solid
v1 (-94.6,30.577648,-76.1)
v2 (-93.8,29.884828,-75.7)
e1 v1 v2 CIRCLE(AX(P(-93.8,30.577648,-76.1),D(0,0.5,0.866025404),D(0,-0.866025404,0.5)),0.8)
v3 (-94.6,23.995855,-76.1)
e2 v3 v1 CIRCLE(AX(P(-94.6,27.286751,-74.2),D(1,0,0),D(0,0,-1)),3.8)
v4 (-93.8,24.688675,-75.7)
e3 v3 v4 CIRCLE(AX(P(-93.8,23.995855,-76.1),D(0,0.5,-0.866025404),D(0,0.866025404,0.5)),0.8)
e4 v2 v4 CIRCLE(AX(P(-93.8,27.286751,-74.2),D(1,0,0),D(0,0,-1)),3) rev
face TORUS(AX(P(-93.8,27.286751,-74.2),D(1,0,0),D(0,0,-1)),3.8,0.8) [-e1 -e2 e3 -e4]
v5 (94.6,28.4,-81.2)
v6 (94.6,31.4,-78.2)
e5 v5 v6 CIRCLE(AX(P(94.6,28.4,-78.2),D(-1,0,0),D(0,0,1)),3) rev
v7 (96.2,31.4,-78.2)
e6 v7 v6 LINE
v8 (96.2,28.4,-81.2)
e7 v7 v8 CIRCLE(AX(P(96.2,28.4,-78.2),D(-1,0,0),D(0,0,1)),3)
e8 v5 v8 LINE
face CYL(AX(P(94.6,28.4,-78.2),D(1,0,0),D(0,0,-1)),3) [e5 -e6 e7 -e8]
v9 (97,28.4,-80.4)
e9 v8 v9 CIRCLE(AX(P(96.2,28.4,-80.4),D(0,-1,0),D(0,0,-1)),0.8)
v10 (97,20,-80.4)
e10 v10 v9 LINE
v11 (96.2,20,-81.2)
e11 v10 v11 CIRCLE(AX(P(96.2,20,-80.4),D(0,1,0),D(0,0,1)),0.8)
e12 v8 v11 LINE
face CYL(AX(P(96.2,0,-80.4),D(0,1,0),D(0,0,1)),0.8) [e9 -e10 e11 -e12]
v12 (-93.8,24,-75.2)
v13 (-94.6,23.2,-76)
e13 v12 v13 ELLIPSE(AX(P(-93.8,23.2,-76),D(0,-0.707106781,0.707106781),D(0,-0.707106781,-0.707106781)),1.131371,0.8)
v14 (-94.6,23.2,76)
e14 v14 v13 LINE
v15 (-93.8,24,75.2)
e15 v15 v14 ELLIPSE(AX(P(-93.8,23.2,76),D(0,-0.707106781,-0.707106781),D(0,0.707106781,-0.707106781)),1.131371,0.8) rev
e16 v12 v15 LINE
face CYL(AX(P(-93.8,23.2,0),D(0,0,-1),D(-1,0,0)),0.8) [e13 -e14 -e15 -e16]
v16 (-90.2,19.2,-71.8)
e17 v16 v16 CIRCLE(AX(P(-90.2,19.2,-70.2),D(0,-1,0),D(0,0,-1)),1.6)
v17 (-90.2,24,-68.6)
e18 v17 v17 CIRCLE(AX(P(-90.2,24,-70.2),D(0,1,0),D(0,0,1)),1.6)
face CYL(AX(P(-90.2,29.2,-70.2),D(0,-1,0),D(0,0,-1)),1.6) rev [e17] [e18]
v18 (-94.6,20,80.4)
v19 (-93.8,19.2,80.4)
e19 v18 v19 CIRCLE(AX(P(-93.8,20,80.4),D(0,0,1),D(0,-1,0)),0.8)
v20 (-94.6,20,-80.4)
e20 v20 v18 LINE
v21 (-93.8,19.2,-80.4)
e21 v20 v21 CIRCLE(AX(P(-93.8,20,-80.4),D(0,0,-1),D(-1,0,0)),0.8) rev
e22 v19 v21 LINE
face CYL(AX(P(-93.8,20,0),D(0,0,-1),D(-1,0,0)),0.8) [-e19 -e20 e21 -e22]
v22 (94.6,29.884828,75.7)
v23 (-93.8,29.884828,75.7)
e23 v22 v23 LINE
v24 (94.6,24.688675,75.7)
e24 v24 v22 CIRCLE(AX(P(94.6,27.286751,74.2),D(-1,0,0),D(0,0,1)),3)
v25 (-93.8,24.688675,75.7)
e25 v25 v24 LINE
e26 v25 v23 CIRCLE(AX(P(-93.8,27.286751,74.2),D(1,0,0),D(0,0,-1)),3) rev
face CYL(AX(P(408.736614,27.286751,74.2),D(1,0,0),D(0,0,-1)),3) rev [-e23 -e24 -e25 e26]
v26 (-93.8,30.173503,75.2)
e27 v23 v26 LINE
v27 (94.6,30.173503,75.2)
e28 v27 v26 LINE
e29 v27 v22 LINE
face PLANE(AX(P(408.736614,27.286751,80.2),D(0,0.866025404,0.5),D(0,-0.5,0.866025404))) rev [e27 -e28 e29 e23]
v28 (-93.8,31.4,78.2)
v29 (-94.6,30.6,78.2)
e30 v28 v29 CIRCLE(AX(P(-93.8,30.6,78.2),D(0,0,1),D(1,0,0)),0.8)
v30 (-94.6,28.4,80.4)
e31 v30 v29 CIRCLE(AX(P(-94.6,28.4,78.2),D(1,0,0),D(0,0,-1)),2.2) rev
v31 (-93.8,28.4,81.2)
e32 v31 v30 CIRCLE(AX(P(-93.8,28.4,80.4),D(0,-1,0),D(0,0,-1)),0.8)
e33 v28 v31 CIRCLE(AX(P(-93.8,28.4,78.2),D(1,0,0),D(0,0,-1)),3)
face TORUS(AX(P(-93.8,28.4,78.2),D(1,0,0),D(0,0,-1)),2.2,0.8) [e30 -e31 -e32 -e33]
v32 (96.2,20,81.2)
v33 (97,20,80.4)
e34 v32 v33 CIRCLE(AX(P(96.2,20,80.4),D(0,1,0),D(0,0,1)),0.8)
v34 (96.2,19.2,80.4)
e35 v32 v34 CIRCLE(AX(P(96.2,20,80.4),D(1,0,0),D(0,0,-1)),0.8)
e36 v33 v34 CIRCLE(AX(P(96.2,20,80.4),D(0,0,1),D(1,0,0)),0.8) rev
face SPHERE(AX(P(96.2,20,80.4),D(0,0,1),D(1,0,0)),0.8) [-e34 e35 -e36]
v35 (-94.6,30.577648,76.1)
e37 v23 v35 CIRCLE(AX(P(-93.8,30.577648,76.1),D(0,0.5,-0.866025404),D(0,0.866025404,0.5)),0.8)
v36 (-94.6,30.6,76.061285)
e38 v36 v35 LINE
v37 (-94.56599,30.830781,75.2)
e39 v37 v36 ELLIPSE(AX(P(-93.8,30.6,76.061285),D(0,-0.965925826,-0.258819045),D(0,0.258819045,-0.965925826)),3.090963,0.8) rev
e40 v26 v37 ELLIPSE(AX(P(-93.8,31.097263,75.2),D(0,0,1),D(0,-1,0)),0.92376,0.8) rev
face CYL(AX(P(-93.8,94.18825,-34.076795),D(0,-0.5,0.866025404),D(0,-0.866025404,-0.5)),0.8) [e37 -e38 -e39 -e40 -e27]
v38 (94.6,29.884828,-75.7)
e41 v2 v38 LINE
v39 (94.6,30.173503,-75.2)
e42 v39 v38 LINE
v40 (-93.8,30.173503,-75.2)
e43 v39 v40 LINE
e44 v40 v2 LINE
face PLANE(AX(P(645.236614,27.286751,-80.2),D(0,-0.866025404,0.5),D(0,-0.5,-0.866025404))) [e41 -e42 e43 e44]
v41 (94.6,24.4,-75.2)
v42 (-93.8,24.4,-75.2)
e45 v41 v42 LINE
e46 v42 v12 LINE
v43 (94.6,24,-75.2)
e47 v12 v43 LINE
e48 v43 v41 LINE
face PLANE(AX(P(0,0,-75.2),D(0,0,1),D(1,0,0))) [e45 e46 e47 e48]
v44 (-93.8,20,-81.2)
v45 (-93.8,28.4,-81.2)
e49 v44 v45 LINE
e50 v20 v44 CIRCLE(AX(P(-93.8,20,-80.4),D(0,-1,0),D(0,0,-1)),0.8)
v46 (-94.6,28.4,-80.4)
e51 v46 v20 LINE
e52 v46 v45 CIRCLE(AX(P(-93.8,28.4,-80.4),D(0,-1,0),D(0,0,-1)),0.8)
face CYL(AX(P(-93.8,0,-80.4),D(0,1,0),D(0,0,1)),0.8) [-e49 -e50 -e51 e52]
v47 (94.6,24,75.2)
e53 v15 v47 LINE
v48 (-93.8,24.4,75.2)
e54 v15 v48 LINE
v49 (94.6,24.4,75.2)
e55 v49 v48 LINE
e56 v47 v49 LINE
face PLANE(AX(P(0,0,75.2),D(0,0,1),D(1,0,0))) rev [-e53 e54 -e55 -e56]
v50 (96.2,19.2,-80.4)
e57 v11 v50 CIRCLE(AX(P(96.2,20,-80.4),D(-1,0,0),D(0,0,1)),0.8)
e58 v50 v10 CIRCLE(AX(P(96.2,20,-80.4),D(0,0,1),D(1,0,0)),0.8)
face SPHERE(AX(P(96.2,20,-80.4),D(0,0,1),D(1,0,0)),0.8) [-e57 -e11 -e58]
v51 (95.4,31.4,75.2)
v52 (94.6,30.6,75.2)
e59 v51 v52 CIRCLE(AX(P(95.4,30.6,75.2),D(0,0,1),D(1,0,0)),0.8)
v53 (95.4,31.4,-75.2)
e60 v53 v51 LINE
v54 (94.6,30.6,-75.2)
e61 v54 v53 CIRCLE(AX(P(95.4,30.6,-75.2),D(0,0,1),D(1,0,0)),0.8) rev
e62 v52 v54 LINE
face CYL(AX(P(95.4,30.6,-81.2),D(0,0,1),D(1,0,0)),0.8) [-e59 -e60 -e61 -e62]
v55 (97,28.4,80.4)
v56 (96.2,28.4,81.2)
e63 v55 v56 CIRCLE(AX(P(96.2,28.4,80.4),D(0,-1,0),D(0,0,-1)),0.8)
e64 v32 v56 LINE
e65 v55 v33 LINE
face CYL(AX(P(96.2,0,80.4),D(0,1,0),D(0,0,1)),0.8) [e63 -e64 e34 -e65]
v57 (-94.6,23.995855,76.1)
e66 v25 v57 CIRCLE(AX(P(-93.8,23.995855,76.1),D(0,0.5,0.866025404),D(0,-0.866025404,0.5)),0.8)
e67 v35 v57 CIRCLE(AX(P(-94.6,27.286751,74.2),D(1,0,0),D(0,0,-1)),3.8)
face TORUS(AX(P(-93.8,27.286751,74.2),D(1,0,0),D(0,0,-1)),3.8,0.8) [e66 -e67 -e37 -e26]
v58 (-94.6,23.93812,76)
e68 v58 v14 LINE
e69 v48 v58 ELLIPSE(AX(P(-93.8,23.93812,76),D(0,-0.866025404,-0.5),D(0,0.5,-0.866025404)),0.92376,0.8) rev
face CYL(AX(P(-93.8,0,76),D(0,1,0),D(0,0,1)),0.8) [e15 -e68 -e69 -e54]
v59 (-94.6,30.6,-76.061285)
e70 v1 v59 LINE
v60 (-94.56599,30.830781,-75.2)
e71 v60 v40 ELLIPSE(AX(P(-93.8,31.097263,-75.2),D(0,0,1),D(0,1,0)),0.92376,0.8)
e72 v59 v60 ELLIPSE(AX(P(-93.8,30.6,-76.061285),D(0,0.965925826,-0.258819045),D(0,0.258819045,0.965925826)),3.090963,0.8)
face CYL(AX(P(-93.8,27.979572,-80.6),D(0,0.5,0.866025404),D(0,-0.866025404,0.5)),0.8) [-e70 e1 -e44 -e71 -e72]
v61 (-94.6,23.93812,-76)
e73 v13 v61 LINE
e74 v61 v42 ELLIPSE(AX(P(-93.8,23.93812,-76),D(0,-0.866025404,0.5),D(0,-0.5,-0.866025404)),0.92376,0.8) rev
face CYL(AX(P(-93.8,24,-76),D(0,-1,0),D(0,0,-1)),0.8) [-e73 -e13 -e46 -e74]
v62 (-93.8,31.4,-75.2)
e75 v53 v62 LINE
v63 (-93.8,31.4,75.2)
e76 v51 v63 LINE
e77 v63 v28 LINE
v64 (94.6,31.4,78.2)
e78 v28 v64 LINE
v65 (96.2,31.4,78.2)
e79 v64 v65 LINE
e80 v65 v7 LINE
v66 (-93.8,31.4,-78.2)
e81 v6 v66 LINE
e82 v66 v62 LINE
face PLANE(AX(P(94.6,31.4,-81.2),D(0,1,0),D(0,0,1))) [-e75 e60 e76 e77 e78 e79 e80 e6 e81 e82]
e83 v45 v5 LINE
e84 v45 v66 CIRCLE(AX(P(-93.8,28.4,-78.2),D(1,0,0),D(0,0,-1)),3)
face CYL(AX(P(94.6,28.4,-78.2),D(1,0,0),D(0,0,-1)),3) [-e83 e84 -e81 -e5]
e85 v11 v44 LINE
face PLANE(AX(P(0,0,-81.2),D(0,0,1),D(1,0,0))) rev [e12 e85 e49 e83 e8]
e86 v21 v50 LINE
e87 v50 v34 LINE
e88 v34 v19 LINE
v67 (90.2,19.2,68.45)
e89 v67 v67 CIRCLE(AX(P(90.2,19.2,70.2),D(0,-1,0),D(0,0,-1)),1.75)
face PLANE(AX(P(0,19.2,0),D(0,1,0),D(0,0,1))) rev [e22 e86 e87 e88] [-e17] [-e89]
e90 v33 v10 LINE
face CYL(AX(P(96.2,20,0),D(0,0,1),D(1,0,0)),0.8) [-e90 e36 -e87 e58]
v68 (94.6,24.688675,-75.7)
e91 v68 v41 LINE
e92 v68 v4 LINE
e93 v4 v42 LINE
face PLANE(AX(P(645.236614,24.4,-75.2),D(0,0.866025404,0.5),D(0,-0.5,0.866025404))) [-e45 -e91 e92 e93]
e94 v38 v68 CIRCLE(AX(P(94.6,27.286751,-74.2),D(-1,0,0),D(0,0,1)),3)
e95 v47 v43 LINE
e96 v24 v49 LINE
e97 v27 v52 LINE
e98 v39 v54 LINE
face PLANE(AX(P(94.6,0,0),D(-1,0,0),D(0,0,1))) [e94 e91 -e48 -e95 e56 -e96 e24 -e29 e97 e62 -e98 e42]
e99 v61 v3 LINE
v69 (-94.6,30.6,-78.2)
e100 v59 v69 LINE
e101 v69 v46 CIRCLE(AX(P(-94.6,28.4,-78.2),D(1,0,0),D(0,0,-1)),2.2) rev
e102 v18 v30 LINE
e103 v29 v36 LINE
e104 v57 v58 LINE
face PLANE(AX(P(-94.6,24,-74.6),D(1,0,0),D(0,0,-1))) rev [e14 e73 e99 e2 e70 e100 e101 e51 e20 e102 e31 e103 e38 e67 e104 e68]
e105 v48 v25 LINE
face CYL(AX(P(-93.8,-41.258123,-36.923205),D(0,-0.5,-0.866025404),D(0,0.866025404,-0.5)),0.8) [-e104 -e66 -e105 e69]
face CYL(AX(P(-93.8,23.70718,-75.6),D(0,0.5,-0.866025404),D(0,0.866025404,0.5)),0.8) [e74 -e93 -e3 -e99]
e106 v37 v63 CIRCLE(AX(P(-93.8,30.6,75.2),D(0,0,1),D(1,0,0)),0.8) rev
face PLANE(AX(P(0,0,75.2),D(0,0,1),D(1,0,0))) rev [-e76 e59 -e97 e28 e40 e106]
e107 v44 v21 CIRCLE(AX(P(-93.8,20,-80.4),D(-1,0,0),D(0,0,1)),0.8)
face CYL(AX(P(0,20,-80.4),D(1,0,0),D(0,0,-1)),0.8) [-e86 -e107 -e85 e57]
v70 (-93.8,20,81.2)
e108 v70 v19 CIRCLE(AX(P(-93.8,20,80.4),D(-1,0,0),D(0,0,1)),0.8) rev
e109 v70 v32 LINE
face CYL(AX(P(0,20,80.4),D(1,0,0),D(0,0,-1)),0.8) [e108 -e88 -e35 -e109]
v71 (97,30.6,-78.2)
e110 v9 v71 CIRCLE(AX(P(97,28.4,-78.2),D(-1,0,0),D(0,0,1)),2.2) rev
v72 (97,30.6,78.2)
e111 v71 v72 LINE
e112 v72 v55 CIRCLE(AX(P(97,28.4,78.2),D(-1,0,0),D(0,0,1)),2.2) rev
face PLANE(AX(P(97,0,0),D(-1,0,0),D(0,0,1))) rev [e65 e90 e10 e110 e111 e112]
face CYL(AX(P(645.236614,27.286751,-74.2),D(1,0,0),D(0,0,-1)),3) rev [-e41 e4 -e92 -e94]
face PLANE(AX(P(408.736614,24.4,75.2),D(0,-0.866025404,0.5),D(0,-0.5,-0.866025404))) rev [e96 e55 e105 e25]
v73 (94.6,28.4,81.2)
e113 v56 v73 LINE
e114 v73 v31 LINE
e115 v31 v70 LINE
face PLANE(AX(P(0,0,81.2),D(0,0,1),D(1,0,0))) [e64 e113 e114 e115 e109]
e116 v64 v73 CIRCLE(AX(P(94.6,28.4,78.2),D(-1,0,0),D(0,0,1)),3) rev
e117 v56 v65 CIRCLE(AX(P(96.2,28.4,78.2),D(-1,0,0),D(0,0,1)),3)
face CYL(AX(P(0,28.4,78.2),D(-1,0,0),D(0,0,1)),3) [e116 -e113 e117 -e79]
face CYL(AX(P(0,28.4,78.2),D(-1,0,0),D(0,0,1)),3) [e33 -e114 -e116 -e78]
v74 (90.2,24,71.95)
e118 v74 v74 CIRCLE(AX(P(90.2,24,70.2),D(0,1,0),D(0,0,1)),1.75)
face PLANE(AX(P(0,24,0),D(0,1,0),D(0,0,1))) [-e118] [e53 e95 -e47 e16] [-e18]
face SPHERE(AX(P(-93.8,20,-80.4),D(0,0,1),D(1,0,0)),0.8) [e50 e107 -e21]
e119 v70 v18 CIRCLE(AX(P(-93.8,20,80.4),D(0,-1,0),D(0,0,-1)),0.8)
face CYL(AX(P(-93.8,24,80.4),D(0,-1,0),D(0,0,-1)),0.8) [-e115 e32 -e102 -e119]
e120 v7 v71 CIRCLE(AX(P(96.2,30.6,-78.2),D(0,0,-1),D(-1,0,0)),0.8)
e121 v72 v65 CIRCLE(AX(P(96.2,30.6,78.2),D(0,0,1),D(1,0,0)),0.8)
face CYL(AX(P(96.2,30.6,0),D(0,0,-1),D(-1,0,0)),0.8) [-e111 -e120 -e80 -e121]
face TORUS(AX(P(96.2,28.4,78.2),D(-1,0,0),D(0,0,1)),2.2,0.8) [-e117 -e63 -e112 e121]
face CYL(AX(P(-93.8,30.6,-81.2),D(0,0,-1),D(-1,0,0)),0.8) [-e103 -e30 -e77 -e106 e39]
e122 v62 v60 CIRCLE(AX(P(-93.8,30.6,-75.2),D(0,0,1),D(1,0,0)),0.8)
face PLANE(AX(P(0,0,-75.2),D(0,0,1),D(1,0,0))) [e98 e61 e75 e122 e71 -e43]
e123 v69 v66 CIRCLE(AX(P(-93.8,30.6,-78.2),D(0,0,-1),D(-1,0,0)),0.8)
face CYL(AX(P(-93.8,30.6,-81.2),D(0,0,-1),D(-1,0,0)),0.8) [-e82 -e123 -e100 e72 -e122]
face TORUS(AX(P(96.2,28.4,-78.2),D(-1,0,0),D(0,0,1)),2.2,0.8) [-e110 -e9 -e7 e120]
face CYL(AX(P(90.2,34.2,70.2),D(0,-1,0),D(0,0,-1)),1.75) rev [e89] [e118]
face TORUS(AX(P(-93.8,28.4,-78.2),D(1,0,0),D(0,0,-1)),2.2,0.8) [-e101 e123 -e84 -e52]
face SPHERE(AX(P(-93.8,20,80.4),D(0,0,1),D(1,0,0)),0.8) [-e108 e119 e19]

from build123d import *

# Parameters (mm, degrees)
SKETCH_1_W                         = 189.2
SKETCH_1_H                         = 149.2
EXTRUDE_184_4_144_4_24_DEPTH       = 24
SKETCH_2_W                         = 184.4
SKETCH_2_H                         = 144.4
CUT_EXTRUDE_181_2_141_2_22_4_DEPTH = 22.4
EXTRUDE_972_DEPTH                  = 189.2
EXTRUDE_1201_DEPTH                 = 189.2
SKETCH_11_W                        = 189.2
SKETCH_11_H                        = 16
EXTRUDE_0_6_DEPTH                  = 0.6
PATTERN_LINEAR_4_COUNT             = 2
PATTERN_LINEAR_4_PITCH             = 149.8
SKETCH_13_W                        = 189.2
SKETCH_13_H                        = 15
EXTRUDE_1758_DEPTH                 = 6
PATTERN_LINEAR_5_COUNT             = 2
PATTERN_LINEAR_5_PITCH             = 156.4
CUT_EXTRUDE_2280_DEPTH             = 209.269152781
CUT_EXTRUDE_2280_DEPTH_BACK        = 189.2
CUT_EXTRUDE_START                  = -189.2
CUT_EXTRUDE_2756_DEPTH             = 189.2
FILLET_3_R                         = 3
FILLET_5_R                         = 5
SKETCH_18_W                        = 162.4
SKETCH_18_H                        = 23.4
EXTRUDE_4517_DEPTH                 = 2.4
SKETCH_20_W                        = 42.4
SKETCH_20_H                        = 11
CUT_EXTRUDE_5_DEPTH                = 2.4
SKETCH_21_W                        = 0.6
SKETCH_21_H                        = 52.4
CUT_EXTRUDE_6_DEPTH                = 13
SKETCH_24_W                        = 191.218678314
SKETCH_24_H                        = 37.433567077
CUT_EXTRUDE_8_DEPTH                = 203.6
SKETCH_25_W                        = 191.6
SKETCH_25_H                        = 162.4
EXTRUDE_2_DEPTH                    = 3.2
FILLET_23_R                        = 3
FILLET_16_R                        = 0.8
FILLET_25_R                        = 0.8
SKETCH_26_R                        = 1.6
CUT_EXTRUDE_9_DEPTH                = 10
SKETCH_27_R                        = 1.75
CUT_EXTRUDE_10_DEPTH               = 15


# Read off the part's stored shape, not the designer's step: правый паз
with BuildPart() as part:
    # Эскиз1 → внешний 184,4 х 144,4 х 24 (new body)
    with BuildSketch(Plane(origin=(0, 0, 0), x_dir=(1, 0, 0), z_dir=(0, 1, 0))):
        Rectangle(SKETCH_1_W, SKETCH_1_H)
    extrude(amount=EXTRUDE_184_4_144_4_24_DEPTH)

    # Эскиз2 → внутр размер  181,2 х 141,2 х 22,4 (cut)
    with BuildSketch(Plane(origin=(0, 0, 0), x_dir=(-1, 0, 0), z_dir=(0, -1, 0))):
        Rectangle(SKETCH_2_W, SKETCH_2_H)
    extrude(amount=-CUT_EXTRUDE_181_2_141_2_22_4_DEPTH, mode=Mode.SUBTRACT)

    # Эскиз5 → Extrude 972 (add)
    with BuildSketch(Plane(origin=(94.6, 0, 0), x_dir=(0, 0, -1), z_dir=(1, 0, 0))):
        Polygon((74.6, 0), (79.6, 2.886751346), (74.6, 5.773502692), align=None)
    extrude(amount=-EXTRUDE_972_DEPTH)

    # Эскиз4 → Extrude 1201 (add)
    with BuildSketch(Plane(origin=(94.6, 0, 0), x_dir=(0, 0, -1), z_dir=(1, 0, 0))):
        Polygon((-74.6, 0), (-79.6, 2.886751346), (-74.6, 5.773502692), align=None)
    extrude(amount=-EXTRUDE_1201_DEPTH)

    # Эскиз11 → проставка 0,6 мм (add)
    with BuildSketch(Plane(origin=(0, 0, -74.6), x_dir=(-1, 0, 0), z_dir=(0, 0, -1))):
        with Locations((0, 16)):
            Rectangle(SKETCH_11_W, SKETCH_11_H)
    extrude_0_6 = extrude(amount=EXTRUDE_0_6_DEPTH)

    # Линейный массив4: проставка 0,6 мм ×2
    with Locations(*[(0, 0, i * PATTERN_LINEAR_4_PITCH) for i in range(1, PATTERN_LINEAR_4_COUNT)]):
        add(extrude_0_6)

    # Эскиз13 → Extrude 1758 (add)
    with BuildSketch(Plane(origin=(0, 0, -75.2), x_dir=(-1, 0, 0), z_dir=(0, 0, -1))):
        with Locations((0, 23.9)):
            Rectangle(SKETCH_13_W, SKETCH_13_H)
    extrude_1758 = extrude(amount=EXTRUDE_1758_DEPTH)

    # Линейный массив5: Extrude 1758 ×2
    with Locations(*[(0, 0, i * PATTERN_LINEAR_5_PITCH) for i in range(1, PATTERN_LINEAR_5_COUNT)]):
        add(extrude_1758)

    # Эскиз14 → Cut-Extrude 2280 (cut, two sides: drawn at the far end of the back side and taken through both)
    with BuildSketch(Plane(origin=(94.6, 0, 0), x_dir=(0, 0, -1), z_dir=(1, 0, 0)).offset(-CUT_EXTRUDE_2280_DEPTH_BACK)):
        Polygon((75.2, 30.173502692), (75.2, 24.4), (80.2, 27.286751346), align=None)
    extrude(amount=CUT_EXTRUDE_2280_DEPTH + CUT_EXTRUDE_2280_DEPTH_BACK, mode=Mode.SUBTRACT)

    # Cut-Extrude 2756 outline → Cut-Extrude 2756 (cut)
    with BuildSketch(Plane(origin=(94.6, 0, 0), x_dir=(0, 0, -1), z_dir=(1, 0, 0)).offset(CUT_EXTRUDE_START)):
        Polygon((-75.2, 24.4), (-75.2, 30.173502692), (-80.2, 27.286751346), align=None)
    extrude(amount=CUT_EXTRUDE_2756_DEPTH, mode=Mode.SUBTRACT)

    # Скругление 3 мм
    fillet_3_edges = [part.edges().sort_by_distance(p)[0] for p in [
        (0, 27.286751346, -80.2),
        (0, 27.286751346, 80.2),
        (0, 2.886751346, -79.6),
        (0, 2.886751346, 79.6),
        (0, 16.4, -75.2),
        (0, 31.4, -81.2),
        (0, 16.4, 75.2),
        (0, 31.4, 81.2),
    ]]
    fillet(fillet_3_edges, radius=FILLET_3_R)

    # Скругление 5 мм
    fillet_5_edges = [part.edges().sort_by_distance(p)[0] for p in [
        (0, 16.4, -81.2),
    ]]
    fillet(fillet_5_edges, radius=FILLET_5_R)

    # Эскиз18 → Extrude 4517 (add)
    with BuildSketch(Plane(origin=(94.6, 0, 0), x_dir=(0, 0, -1), z_dir=(1, 0, 0))):
        with Locations((0, 19.7)):
            Rectangle(SKETCH_18_W, SKETCH_18_H)
    extrude(amount=EXTRUDE_4517_DEPTH)

    # Эскиз20 → Вырез-Вытянуть5 (cut)
    with BuildSketch(Plane(origin=(97, 0, 0), x_dir=(0, 0, -1), z_dir=(1, 0, 0))):
        with Locations((0, 13.5)):
            Rectangle(SKETCH_20_W, SKETCH_20_H)
    extrude(amount=-CUT_EXTRUDE_5_DEPTH, mode=Mode.SUBTRACT)

    # Эскиз21 → Вырез-Вытянуть6 (cut)
    with BuildSketch(Plane.XZ.offset(-8)):
        with Locations((94.9, 0)):
            Rectangle(SKETCH_21_W, SKETCH_21_H)
    extrude(amount=-CUT_EXTRUDE_6_DEPTH, mode=Mode.SUBTRACT)

    # Эскиз24 → Вырез-Вытянуть8 (cut)
    with BuildSketch(Plane.ZY.offset(94.6)):
        with Locations((-2.778384041, 3.683216462)):
            Rectangle(SKETCH_24_W, SKETCH_24_H)
    extrude(amount=-CUT_EXTRUDE_8_DEPTH, mode=Mode.SUBTRACT)

    # Эскиз25 → Бобышка-Вытянуть2 (add)
    with BuildSketch(Plane.XZ.offset(-22.4)):
        with Locations((1.2, 0)):
            Rectangle(SKETCH_25_W, SKETCH_25_H)
    extrude(amount=EXTRUDE_2_DEPTH)

    # Скругление23
    fillet_23_edges = [part.edges().sort_by_distance(p)[0] for p in [
        (95.8, 31.4, -81.2),
        (95.8, 31.4, 81.2),
    ]]
    fillet(fillet_23_edges, radius=FILLET_23_R)

    # Скругление16
    fillet_16_edges = [part.edges().sort_by_distance(p)[0] for p in [
        (94.6, 31.4, 0),
        (97, 23.8, -81.2),
        (97, 19.2, 0),
        (97, 31.4, 0),
        (97, 23.8, 81.2),
        (97, 30.521320344, 80.321320344),
        (97, 30.521320344, -80.321320344),
    ]]
    fillet(fillet_16_edges, radius=FILLET_16_R)

    # Скругление25
    # the kernel refuses this fillet: 0.8 mm, written as the material it takes off along each edge
    with BuildSketch(Plane(origin=(96.2, 20, -80.4), x_dir=(0, -1, 0), z_dir=(0, 0, -1))) as fillet_25_piece_1_section:
        Polygon((0, 0), (FILLET_25_R * 1.02, 0), (FILLET_25_R * 1.02, -FILLET_25_R * 1.02), (0, -FILLET_25_R * 1.02), align=None)
    fillet_25_piece_1 = extrude(amount=FILLET_25_R * 1.02, mode=Mode.PRIVATE)
    fillet_25_piece_1 = fillet_25_piece_1 - Plane(origin=(96.2, 20, -80.4), x_dir=(-0.7071067811865475, 0.7071067811865475, 0), z_dir=(0, 0, -1)) * Sphere(FILLET_25_R, mode=Mode.PRIVATE)
    add(fillet_25_piece_1, mode=Mode.SUBTRACT)
    with BuildSketch(Plane(origin=(96.2, 20, 80.4), x_dir=(0, -1, 0), z_dir=(0, 0, 1))) as fillet_25_piece_2_section:
        Polygon((0, 0), (FILLET_25_R * 1.02, 0), (FILLET_25_R * 1.02, FILLET_25_R * 1.02), (0, FILLET_25_R * 1.02), align=None)
    fillet_25_piece_2 = extrude(amount=FILLET_25_R * 1.02, mode=Mode.PRIVATE)
    fillet_25_piece_2 = fillet_25_piece_2 - Plane(origin=(96.2, 20, 80.4), x_dir=(-0.7071067811865475, 0.7071067811865475, 0), z_dir=(0, 0, 1)) * Sphere(FILLET_25_R, mode=Mode.PRIVATE)
    add(fillet_25_piece_2, mode=Mode.SUBTRACT)
    with BuildSketch(Plane(origin=(-93.8, 20, -80.4), x_dir=(-1, 0, 0), z_dir=(0, 0, -1))) as fillet_25_piece_3_section:
        Polygon((0, 0), (FILLET_25_R * 1.02, 0), (FILLET_25_R * 1.02, -FILLET_25_R * 1.02), (0, -FILLET_25_R * 1.02), align=None)
    fillet_25_piece_3 = extrude(amount=FILLET_25_R * 1.02, mode=Mode.PRIVATE)
    fillet_25_piece_3 = fillet_25_piece_3 - Plane(origin=(-93.8, 20, -80.4), x_dir=(0.7071067811865475, 0.7071067811865475, 0), z_dir=(0, 0, -1)) * Sphere(FILLET_25_R, mode=Mode.PRIVATE)
    add(fillet_25_piece_3, mode=Mode.SUBTRACT)
    with BuildSketch(Plane(origin=(-93.8, 20, 80.4), x_dir=(0, -1, 0), z_dir=(0, 0, 1))) as fillet_25_piece_4_section:
        Polygon((0, 0), (FILLET_25_R * 1.02, 0), (FILLET_25_R * 1.02, -FILLET_25_R * 1.02), (0, -FILLET_25_R * 1.02), align=None)
    fillet_25_piece_4 = extrude(amount=FILLET_25_R * 1.02, mode=Mode.PRIVATE)
    fillet_25_piece_4 = fillet_25_piece_4 - Plane(origin=(-93.8, 20, 80.4), x_dir=(0.7071067811865475, 0.7071067811865475, 0), z_dir=(0, 0, 1)) * Sphere(FILLET_25_R, mode=Mode.PRIVATE)
    add(fillet_25_piece_4, mode=Mode.SUBTRACT)
    with BuildSketch(Plane(origin=(-94.6, 24, 75.2), x_dir=(0, -1, 0), z_dir=(0, 0, -1))) as fillet_25_piece_5:
        with BuildLine():
            CenterArc((FILLET_25_R, -FILLET_25_R), FILLET_25_R, 90, 90)
            Line((0, -FILLET_25_R), (-FILLET_25_R * 0.02, -FILLET_25_R))
            Line((-FILLET_25_R * 0.02, -FILLET_25_R), (-FILLET_25_R * 0.02, FILLET_25_R * 0.02))
            Line((-FILLET_25_R * 0.02, FILLET_25_R * 0.02), (FILLET_25_R, FILLET_25_R * 0.02))
            Line((FILLET_25_R, FILLET_25_R * 0.02), (FILLET_25_R, 0))
        make_face()
    extrude(amount=150.4, mode=Mode.SUBTRACT)
    with BuildSketch(Plane(origin=(-94.6, 29.884827557, -75.7), x_dir=(0, 0.8660254037844402, -0.4999999999999975), z_dir=(0, 0.4999999999999975, 0.8660254037844402))) as fillet_25_piece_6_section:
        with BuildLine():
            CenterArc((FILLET_25_R, -FILLET_25_R), FILLET_25_R, 90, 90)
            Line((0, -FILLET_25_R), (-FILLET_25_R * 0.02, -FILLET_25_R))
            Line((-FILLET_25_R * 0.02, -FILLET_25_R), (-FILLET_25_R * 0.02, FILLET_25_R * 0.02))
            Line((-FILLET_25_R * 0.02, FILLET_25_R * 0.02), (FILLET_25_R, FILLET_25_R * 0.02))
            Line((FILLET_25_R, FILLET_25_R * 0.02), (FILLET_25_R, 0))
        make_face()
    fillet_25_piece_6 = extrude(amount=2.577350269, mode=Mode.PRIVATE)
    fillet_25_piece_6 = split(fillet_25_piece_6, bisect_by=Plane(origin=(-94.433761612, 30.237602943, -75.2), z_dir=(0, 0, -1)), keep=Keep.TOP, mode=Mode.PRIVATE)
    add(fillet_25_piece_6, mode=Mode.SUBTRACT)
    with BuildSketch(Plane(origin=(-94.6, 31.173502692, 73.467949192), x_dir=(0, 0.8660254037805483, 0.5000000000067384), z_dir=(0, -0.5000000000067384, 0.8660254037805484))) as fillet_25_piece_7_section:
        with BuildLine():
            CenterArc((FILLET_25_R, -FILLET_25_R), FILLET_25_R, 90, 90)
            Line((0, -FILLET_25_R), (-FILLET_25_R * 0.02, -FILLET_25_R))
            Line((-FILLET_25_R * 0.02, -FILLET_25_R), (-FILLET_25_R * 0.02, FILLET_25_R * 0.02))
            Line((-FILLET_25_R * 0.02, FILLET_25_R * 0.02), (FILLET_25_R, FILLET_25_R * 0.02))
            Line((FILLET_25_R, FILLET_25_R * 0.02), (FILLET_25_R, 0))
        make_face()
    fillet_25_piece_7 = extrude(amount=2.577350269, mode=Mode.PRIVATE)
    fillet_25_piece_7 = split(fillet_25_piece_7, bisect_by=Plane(origin=(-94.433761612, 30.237602943, 75.2), z_dir=(0, 0, 1)), keep=Keep.TOP, mode=Mode.PRIVATE)
    add(fillet_25_piece_7, mode=Mode.SUBTRACT)
    with BuildSketch(Plane(origin=(-94.6, 24.688675135, 75.7), x_dir=(0, -0.8660254037805483, 0.5000000000067384), z_dir=(0, -0.5000000000067384, -0.8660254037805484))) as fillet_25_piece_8_section:
        with BuildLine():
            CenterArc((FILLET_25_R, -FILLET_25_R), FILLET_25_R, 90, 90)
            Line((0, -FILLET_25_R), (-FILLET_25_R * 0.02, -FILLET_25_R))
            Line((-FILLET_25_R * 0.02, -FILLET_25_R), (-FILLET_25_R * 0.02, FILLET_25_R * 0.02))
            Line((-FILLET_25_R * 0.02, FILLET_25_R * 0.02), (FILLET_25_R, FILLET_25_R * 0.02))
            Line((FILLET_25_R, FILLET_25_R * 0.02), (FILLET_25_R, 0))
        make_face()
    fillet_25_piece_8 = extrude(amount=2.577350269, mode=Mode.PRIVATE)
    fillet_25_piece_8 = split(fillet_25_piece_8, bisect_by=Plane(origin=(-94.433761612, 24.335899749, 75.2), z_dir=(0, 0, 1)), keep=Keep.TOP, mode=Mode.PRIVATE)
    add(fillet_25_piece_8, mode=Mode.SUBTRACT)
    with BuildSketch(Plane(origin=(-94.6, 23.4, -73.467949192), x_dir=(0, -0.8660254037844398, -0.499999999999998), z_dir=(0, 0.49999999999999795, -0.8660254037844398))) as fillet_25_piece_9_section:
        with BuildLine():
            CenterArc((FILLET_25_R, -FILLET_25_R), FILLET_25_R, 90, 90)
            Line((0, -FILLET_25_R), (-FILLET_25_R * 0.02, -FILLET_25_R))
            Line((-FILLET_25_R * 0.02, -FILLET_25_R), (-FILLET_25_R * 0.02, FILLET_25_R * 0.02))
            Line((-FILLET_25_R * 0.02, FILLET_25_R * 0.02), (FILLET_25_R, FILLET_25_R * 0.02))
            Line((FILLET_25_R, FILLET_25_R * 0.02), (FILLET_25_R, 0))
        make_face()
    fillet_25_piece_9 = extrude(amount=2.577350269, mode=Mode.PRIVATE)
    fillet_25_piece_9 = split(fillet_25_piece_9, bisect_by=Plane(origin=(-94.433761612, 24.335899749, -75.2), z_dir=(0, 0, -1)), keep=Keep.TOP, mode=Mode.PRIVATE)
    add(fillet_25_piece_9, mode=Mode.SUBTRACT)
    with BuildSketch(Plane(origin=(-94.6, 31.4, -75.2), x_dir=(0, -1, 0), z_dir=(0, 0, -1)), Plane(origin=(-94.6, 31.4, 78.2), x_dir=(0, -1, 0), z_dir=(0, 0, -1))) as fillet_25_piece_10:
        with BuildLine():
            CenterArc((FILLET_25_R, -FILLET_25_R), FILLET_25_R, 90, 90)
            Line((0, -FILLET_25_R), (-FILLET_25_R * 0.02, -FILLET_25_R))
            Line((-FILLET_25_R * 0.02, -FILLET_25_R), (-FILLET_25_R * 0.02, FILLET_25_R * 0.02))
            Line((-FILLET_25_R * 0.02, FILLET_25_R * 0.02), (FILLET_25_R, FILLET_25_R * 0.02))
            Line((FILLET_25_R, FILLET_25_R * 0.02), (FILLET_25_R, 0))
        make_face()
    extrude(amount=3, mode=Mode.SUBTRACT)
    with BuildSketch(Plane(origin=(-94.6, 28.4, -78.2), x_dir=(0, 1, 0), z_dir=(0, 0, 1))) as fillet_25_piece_11:
        with BuildLine():
            CenterArc((3 - FILLET_25_R, -FILLET_25_R), FILLET_25_R, 0, 90)
            Line((3, -FILLET_25_R), (3 + FILLET_25_R * 0.02, -FILLET_25_R))
            Line((3 + FILLET_25_R * 0.02, -FILLET_25_R), (3 + FILLET_25_R * 0.02, FILLET_25_R * 0.02))
            Line((3 + FILLET_25_R * 0.02, FILLET_25_R * 0.02), (3 - FILLET_25_R, FILLET_25_R * 0.02))
            Line((3 - FILLET_25_R, FILLET_25_R * 0.02), (3 - FILLET_25_R, 0))
        make_face()
    revolve(axis=Axis((-94.6, 28.4, -78.2), (-1, 0, 0)), revolution_arc=90, mode=Mode.SUBTRACT)
    with BuildSketch(Plane(origin=(-94.6, 28.4, 78.2), x_dir=(0, 0, 1), z_dir=(0, -1, 0))) as fillet_25_piece_12:
        with BuildLine():
            CenterArc((3 - FILLET_25_R, -FILLET_25_R), FILLET_25_R, 0, 90)
            Line((3, -FILLET_25_R), (3 + FILLET_25_R * 0.02, -FILLET_25_R))
            Line((3 + FILLET_25_R * 0.02, -FILLET_25_R), (3 + FILLET_25_R * 0.02, FILLET_25_R * 0.02))
            Line((3 + FILLET_25_R * 0.02, FILLET_25_R * 0.02), (3 - FILLET_25_R, FILLET_25_R * 0.02))
            Line((3 - FILLET_25_R, FILLET_25_R * 0.02), (3 - FILLET_25_R, 0))
        make_face()
    revolve(axis=Axis((-94.6, 28.4, 78.2), (-1, 0, 0)), revolution_arc=90, mode=Mode.SUBTRACT)
    with BuildSketch(Plane(origin=(-94.6, 27.286751346, 74.2), x_dir=(0, 0.866025403780547, 0.5000000000067405), z_dir=(0, 0.5000000000067405, -0.866025403780547))) as fillet_25_piece_13:
        with BuildLine():
            CenterArc((3 + FILLET_25_R, FILLET_25_R), FILLET_25_R, 180, 90)
            Line((3, FILLET_25_R), (3 - FILLET_25_R * 0.02, FILLET_25_R))
            Line((3 - FILLET_25_R * 0.02, FILLET_25_R), (3 - FILLET_25_R * 0.02, -FILLET_25_R * 0.02))
            Line((3 - FILLET_25_R * 0.02, -FILLET_25_R * 0.02), (3 + FILLET_25_R, -FILLET_25_R * 0.02))
            Line((3 + FILLET_25_R, -FILLET_25_R * 0.02), (3 + FILLET_25_R, 0))
        make_face()
    revolve(axis=Axis((-94.6, 27.286751346, 74.2), (1, 0, 0)), revolution_arc=119.999999999, mode=Mode.SUBTRACT)
    with BuildSketch(Plane(origin=(-94.6, 27.286751346, -74.2), x_dir=(0, -0.8660254037844387, -0.5), z_dir=(0, -0.5, 0.8660254037844387))) as fillet_25_piece_14:
        with BuildLine():
            CenterArc((3 + FILLET_25_R, FILLET_25_R), FILLET_25_R, 180, 90)
            Line((3, FILLET_25_R), (3 - FILLET_25_R * 0.02, FILLET_25_R))
            Line((3 - FILLET_25_R * 0.02, FILLET_25_R), (3 - FILLET_25_R * 0.02, -FILLET_25_R * 0.02))
            Line((3 - FILLET_25_R * 0.02, -FILLET_25_R * 0.02), (3 + FILLET_25_R, -FILLET_25_R * 0.02))
            Line((3 + FILLET_25_R, -FILLET_25_R * 0.02), (3 + FILLET_25_R, 0))
        make_face()
    revolve(axis=Axis((-94.6, 27.286751346, -74.2), (1, 0, 0)), revolution_arc=120, mode=Mode.SUBTRACT)
    with BuildSketch(Plane(origin=(-94.6, 28.4, -81.2), x_dir=(1, 0, 0), z_dir=(0, -1, 0))) as fillet_25_piece_15:
        with BuildLine():
            CenterArc((FILLET_25_R, FILLET_25_R), FILLET_25_R, 180, 90)
            Line((0, FILLET_25_R), (-FILLET_25_R * 0.02, FILLET_25_R))
            Line((-FILLET_25_R * 0.02, FILLET_25_R), (-FILLET_25_R * 0.02, -FILLET_25_R * 0.02))
            Line((-FILLET_25_R * 0.02, -FILLET_25_R * 0.02), (FILLET_25_R, -FILLET_25_R * 0.02))
            Line((FILLET_25_R, -FILLET_25_R * 0.02), (FILLET_25_R, 0))
        make_face()
    extrude(amount=8.4, mode=Mode.SUBTRACT)
    with BuildSketch(Plane(origin=(-94.6, 19.2, 80.4), x_dir=(0, 1, 0), z_dir=(0, 0, -1))) as fillet_25_piece_16:
        with BuildLine():
            CenterArc((FILLET_25_R, FILLET_25_R), FILLET_25_R, 180, 90)
            Line((0, FILLET_25_R), (-FILLET_25_R * 0.02, FILLET_25_R))
            Line((-FILLET_25_R * 0.02, FILLET_25_R), (-FILLET_25_R * 0.02, -FILLET_25_R * 0.02))
            Line((-FILLET_25_R * 0.02, -FILLET_25_R * 0.02), (FILLET_25_R, -FILLET_25_R * 0.02))
            Line((FILLET_25_R, -FILLET_25_R * 0.02), (FILLET_25_R, 0))
        make_face()
    extrude(amount=160.8, mode=Mode.SUBTRACT)
    with BuildSketch(Plane(origin=(-93.8, 19.2, -81.2), x_dir=(0, 1, 0), z_dir=(1, 0, 0)), Plane(origin=(96.2, 19.2, 81.2), x_dir=(0, 1, 0), z_dir=(-1, 0, 0))) as fillet_25_piece_17:
        with BuildLine():
            CenterArc((FILLET_25_R, FILLET_25_R), FILLET_25_R, 180, 90)
            Line((0, FILLET_25_R), (-FILLET_25_R * 0.02, FILLET_25_R))
            Line((-FILLET_25_R * 0.02, FILLET_25_R), (-FILLET_25_R * 0.02, -FILLET_25_R * 0.02))
            Line((-FILLET_25_R * 0.02, -FILLET_25_R * 0.02), (FILLET_25_R, -FILLET_25_R * 0.02))
            Line((FILLET_25_R, -FILLET_25_R * 0.02), (FILLET_25_R, 0))
        make_face()
    extrude(amount=190, mode=Mode.SUBTRACT)
    with BuildSketch(Plane(origin=(-94.6, 24, -75.2), x_dir=(0, 0, -1), z_dir=(0, 1, 0))) as fillet_25_piece_18_section:
        with BuildLine():
            CenterArc((FILLET_25_R, -FILLET_25_R), FILLET_25_R, 90, 90)
            Line((0, -FILLET_25_R), (-FILLET_25_R * 0.02, -FILLET_25_R))
            Line((-FILLET_25_R * 0.02, -FILLET_25_R), (-FILLET_25_R * 0.02, FILLET_25_R * 0.02))
            Line((-FILLET_25_R * 0.02, FILLET_25_R * 0.02), (FILLET_25_R, FILLET_25_R * 0.02))
            Line((FILLET_25_R, FILLET_25_R * 0.02), (FILLET_25_R, 0))
        make_face()
    fillet_25_piece_18 = extrude(amount=2.4, mode=Mode.PRIVATE)
    fillet_25_piece_18 = split(fillet_25_piece_18, bisect_by=Plane(origin=(-94.438990972, 24.458690707, -75.301655286), z_dir=(0, -0.8660254037844398, -0.49999999999999795)), keep=Keep.TOP, mode=Mode.PRIVATE)
    add(fillet_25_piece_18, mode=Mode.SUBTRACT)
    with BuildSketch(Plane(origin=(-94.6, 24, 75.2), x_dir=(0, 0, 1), z_dir=(0, 1, 0))) as fillet_25_piece_19_section:
        with BuildLine():
            CenterArc((FILLET_25_R, FILLET_25_R), FILLET_25_R, 180, 90)
            Line((0, FILLET_25_R), (-FILLET_25_R * 0.02, FILLET_25_R))
            Line((-FILLET_25_R * 0.02, FILLET_25_R), (-FILLET_25_R * 0.02, -FILLET_25_R * 0.02))
            Line((-FILLET_25_R * 0.02, -FILLET_25_R * 0.02), (FILLET_25_R, -FILLET_25_R * 0.02))
            Line((FILLET_25_R, -FILLET_25_R * 0.02), (FILLET_25_R, 0))
        make_face()
    fillet_25_piece_19 = extrude(amount=2.4, mode=Mode.PRIVATE)
    fillet_25_piece_19 = split(fillet_25_piece_19, bisect_by=Plane(origin=(-94.438990972, 24.458690707, 75.301655286), z_dir=(0, -0.8660254037805485, 0.5000000000067384)), keep=Keep.TOP, mode=Mode.PRIVATE)
    add(fillet_25_piece_19, mode=Mode.SUBTRACT)
    with BuildSketch(Plane(origin=(-94.6, 20, 81.2), x_dir=(0, 0, -1), z_dir=(0, 1, 0))) as fillet_25_piece_20:
        with BuildLine():
            CenterArc((FILLET_25_R, -FILLET_25_R), FILLET_25_R, 90, 90)
            Line((0, -FILLET_25_R), (-FILLET_25_R * 0.02, -FILLET_25_R))
            Line((-FILLET_25_R * 0.02, -FILLET_25_R), (-FILLET_25_R * 0.02, FILLET_25_R * 0.02))
            Line((-FILLET_25_R * 0.02, FILLET_25_R * 0.02), (FILLET_25_R, FILLET_25_R * 0.02))
            Line((FILLET_25_R, FILLET_25_R * 0.02), (FILLET_25_R, 0))
        make_face()
    extrude(amount=8.4, mode=Mode.SUBTRACT)
    with BuildSketch(Plane(origin=(-94.6, 22, 75.2), x_dir=(0, 0, 1), z_dir=(0, 1, 0))) as fillet_25_piece_21a_section:
        with BuildLine():
            CenterArc((FILLET_25_R, FILLET_25_R), FILLET_25_R, 180, 90)
            Line((0, FILLET_25_R), (-FILLET_25_R * 0.02, FILLET_25_R))
            Line((-FILLET_25_R * 0.02, FILLET_25_R), (-FILLET_25_R * 0.02, -FILLET_25_R * 0.02))
            Line((-FILLET_25_R * 0.02, -FILLET_25_R * 0.02), (FILLET_25_R, -FILLET_25_R * 0.02))
            Line((FILLET_25_R, -FILLET_25_R * 0.02), (FILLET_25_R, 0))
        make_face()
    fillet_25_piece_21a = extrude(amount=4.4, mode=Mode.PRIVATE)
    fillet_25_piece_21a = split(fillet_25_piece_21a, bisect_by=Plane(origin=(-94.418883909, 24, 75.381116091), z_dir=(0, -1, 0)), keep=Keep.TOP, mode=Mode.PRIVATE)
    with BuildSketch(Plane(origin=(-94.6, 24, 77.2), x_dir=(0, -1, 0), z_dir=(0, 0, -1))) as fillet_25_piece_21b_section:
        with BuildLine():
            CenterArc((FILLET_25_R, -FILLET_25_R), FILLET_25_R, 90, 90)
            Line((0, -FILLET_25_R), (-FILLET_25_R * 0.02, -FILLET_25_R))
            Line((-FILLET_25_R * 0.02, -FILLET_25_R), (-FILLET_25_R * 0.02, FILLET_25_R * 0.02))
            Line((-FILLET_25_R * 0.02, FILLET_25_R * 0.02), (FILLET_25_R, FILLET_25_R * 0.02))
            Line((FILLET_25_R, FILLET_25_R * 0.02), (FILLET_25_R, 0))
        make_face()
    fillet_25_piece_21b = extrude(amount=152.4, mode=Mode.PRIVATE)
    fillet_25_piece_21b = split(fillet_25_piece_21b, bisect_by=Plane(origin=(-94.418883909, 23.818883909, 75.2), z_dir=(0, 0, 1)), keep=Keep.TOP, mode=Mode.PRIVATE)
    fillet_25_piece_21 = fillet_25_piece_21a & fillet_25_piece_21b
    add(fillet_25_piece_21, mode=Mode.SUBTRACT)
    with BuildSketch(Plane(origin=(-94.6, 24, 75.2), x_dir=(0, -1, 0), z_dir=(0, 0, -1))) as fillet_25_piece_22a_section:
        with BuildLine():
            CenterArc((FILLET_25_R, -FILLET_25_R), FILLET_25_R, 90, 90)
            Line((0, -FILLET_25_R), (-FILLET_25_R * 0.02, -FILLET_25_R))
            Line((-FILLET_25_R * 0.02, -FILLET_25_R), (-FILLET_25_R * 0.02, FILLET_25_R * 0.02))
            Line((-FILLET_25_R * 0.02, FILLET_25_R * 0.02), (FILLET_25_R, FILLET_25_R * 0.02))
            Line((FILLET_25_R, FILLET_25_R * 0.02), (FILLET_25_R, 0))
        make_face()
    fillet_25_piece_22a = extrude(amount=152.4, mode=Mode.PRIVATE)
    fillet_25_piece_22a = split(fillet_25_piece_22a, bisect_by=Plane(origin=(-94.418883909, 23.818883909, -75.2), z_dir=(0, 0, -1)), keep=Keep.TOP, mode=Mode.PRIVATE)
    with BuildSketch(Plane(origin=(-94.6, 22, -75.2), x_dir=(0, 0, -1), z_dir=(0, 1, 0))) as fillet_25_piece_22b_section:
        with BuildLine():
            CenterArc((FILLET_25_R, -FILLET_25_R), FILLET_25_R, 90, 90)
            Line((0, -FILLET_25_R), (-FILLET_25_R * 0.02, -FILLET_25_R))
            Line((-FILLET_25_R * 0.02, -FILLET_25_R), (-FILLET_25_R * 0.02, FILLET_25_R * 0.02))
            Line((-FILLET_25_R * 0.02, FILLET_25_R * 0.02), (FILLET_25_R, FILLET_25_R * 0.02))
            Line((FILLET_25_R, FILLET_25_R * 0.02), (FILLET_25_R, 0))
        make_face()
    fillet_25_piece_22b = extrude(amount=4.4, mode=Mode.PRIVATE)
    fillet_25_piece_22b = split(fillet_25_piece_22b, bisect_by=Plane(origin=(-94.418883909, 24, -75.381116091), z_dir=(0, -1, 0)), keep=Keep.TOP, mode=Mode.PRIVATE)
    fillet_25_piece_22 = fillet_25_piece_22a & fillet_25_piece_22b
    add(fillet_25_piece_22, mode=Mode.SUBTRACT)
    with BuildSketch(Plane(origin=(-94.6, 24.688675135, 75.7), x_dir=(0, -0.8660254037805483, 0.5000000000067384), z_dir=(0, -0.5000000000067384, -0.8660254037805484))) as fillet_25_piece_23a_section:
        with BuildLine():
            CenterArc((FILLET_25_R, -FILLET_25_R), FILLET_25_R, 90, 90)
            Line((0, -FILLET_25_R), (-FILLET_25_R * 0.02, -FILLET_25_R))
            Line((-FILLET_25_R * 0.02, -FILLET_25_R), (-FILLET_25_R * 0.02, FILLET_25_R * 0.02))
            Line((-FILLET_25_R * 0.02, FILLET_25_R * 0.02), (FILLET_25_R, FILLET_25_R * 0.02))
            Line((FILLET_25_R, FILLET_25_R * 0.02), (FILLET_25_R, 0))
        make_face()
    fillet_25_piece_23a = extrude(amount=2.577350269, mode=Mode.PRIVATE)
    fillet_25_piece_23a = split(fillet_25_piece_23a, bisect_by=Plane(origin=(-94.413531374, 23.726161265, 75.2), z_dir=(0, 0, -1)), keep=Keep.TOP, mode=Mode.PRIVATE)
    with BuildSketch(Plane(origin=(-94.6, 24, 75.2), x_dir=(0, 0, 1), z_dir=(0, 1, 0))) as fillet_25_piece_23b_section:
        with BuildLine():
            CenterArc((FILLET_25_R, FILLET_25_R), FILLET_25_R, 180, 90)
            Line((0, FILLET_25_R), (-FILLET_25_R * 0.02, FILLET_25_R))
            Line((-FILLET_25_R * 0.02, FILLET_25_R), (-FILLET_25_R * 0.02, -FILLET_25_R * 0.02))
            Line((-FILLET_25_R * 0.02, -FILLET_25_R * 0.02), (FILLET_25_R, -FILLET_25_R * 0.02))
            Line((FILLET_25_R, -FILLET_25_R * 0.02), (FILLET_25_R, 0))
        make_face()
    fillet_25_piece_23b = extrude(amount=2.4, mode=Mode.PRIVATE)
    fillet_25_piece_23b = split(fillet_25_piece_23b, bisect_by=Plane(origin=(-94.413531374, 24.736919367, 75.783561462), z_dir=(0, 0.8660254037805485, -0.5000000000067384)), keep=Keep.TOP, mode=Mode.PRIVATE)
    fillet_25_piece_23 = fillet_25_piece_23a & fillet_25_piece_23b
    add(fillet_25_piece_23, mode=Mode.SUBTRACT)
    with BuildSketch(Plane(origin=(-94.6, 24, -75.2), x_dir=(0, 0, -1), z_dir=(0, 1, 0))) as fillet_25_piece_24a_section:
        with BuildLine():
            CenterArc((FILLET_25_R, -FILLET_25_R), FILLET_25_R, 90, 90)
            Line((0, -FILLET_25_R), (-FILLET_25_R * 0.02, -FILLET_25_R))
            Line((-FILLET_25_R * 0.02, -FILLET_25_R), (-FILLET_25_R * 0.02, FILLET_25_R * 0.02))
            Line((-FILLET_25_R * 0.02, FILLET_25_R * 0.02), (FILLET_25_R, FILLET_25_R * 0.02))
            Line((FILLET_25_R, FILLET_25_R * 0.02), (FILLET_25_R, 0))
        make_face()
    fillet_25_piece_24a = extrude(amount=2.4, mode=Mode.PRIVATE)
    fillet_25_piece_24a = split(fillet_25_piece_24a, bisect_by=Plane(origin=(-94.413531374, 24.736919367, -75.783561462), z_dir=(0, 0.8660254037844398, 0.49999999999999795)), keep=Keep.TOP, mode=Mode.PRIVATE)
    with BuildSketch(Plane(origin=(-94.6, 23.4, -73.467949192), x_dir=(0, -0.8660254037844398, -0.499999999999998), z_dir=(0, 0.49999999999999795, -0.8660254037844398))) as fillet_25_piece_24b_section:
        with BuildLine():
            CenterArc((FILLET_25_R, -FILLET_25_R), FILLET_25_R, 90, 90)
            Line((0, -FILLET_25_R), (-FILLET_25_R * 0.02, -FILLET_25_R))
            Line((-FILLET_25_R * 0.02, -FILLET_25_R), (-FILLET_25_R * 0.02, FILLET_25_R * 0.02))
            Line((-FILLET_25_R * 0.02, FILLET_25_R * 0.02), (FILLET_25_R, FILLET_25_R * 0.02))
            Line((FILLET_25_R, FILLET_25_R * 0.02), (FILLET_25_R, 0))
        make_face()
    fillet_25_piece_24b = extrude(amount=2.577350269, mode=Mode.PRIVATE)
    fillet_25_piece_24b = split(fillet_25_piece_24b, bisect_by=Plane(origin=(-94.413531374, 23.726161265, -75.2), z_dir=(0, 0, 1)), keep=Keep.TOP, mode=Mode.PRIVATE)
    fillet_25_piece_24 = fillet_25_piece_24a & fillet_25_piece_24b
    add(fillet_25_piece_24, mode=Mode.SUBTRACT)

    # Эскиз26 → Вырез-Вытянуть9 (cut)
    with BuildSketch(Plane.XZ.offset(-19.2)):
        with Locations(Location((-90.2, -70.2, 0), (0, 0, 270))):
            Circle(SKETCH_26_R)
    extrude(amount=-CUT_EXTRUDE_9_DEPTH, mode=Mode.SUBTRACT)

    # Эскиз27 → Вырез-Вытянуть10 (cut)
    with BuildSketch(Plane.XZ.offset(-19.2)):
        with Locations(Location((90.2, 70.2, 0), (0, 0, 270))):
            Circle(SKETCH_27_R)
    extrude(amount=-CUT_EXTRUDE_10_DEPTH, mode=Mode.SUBTRACT)


solid = part.part
